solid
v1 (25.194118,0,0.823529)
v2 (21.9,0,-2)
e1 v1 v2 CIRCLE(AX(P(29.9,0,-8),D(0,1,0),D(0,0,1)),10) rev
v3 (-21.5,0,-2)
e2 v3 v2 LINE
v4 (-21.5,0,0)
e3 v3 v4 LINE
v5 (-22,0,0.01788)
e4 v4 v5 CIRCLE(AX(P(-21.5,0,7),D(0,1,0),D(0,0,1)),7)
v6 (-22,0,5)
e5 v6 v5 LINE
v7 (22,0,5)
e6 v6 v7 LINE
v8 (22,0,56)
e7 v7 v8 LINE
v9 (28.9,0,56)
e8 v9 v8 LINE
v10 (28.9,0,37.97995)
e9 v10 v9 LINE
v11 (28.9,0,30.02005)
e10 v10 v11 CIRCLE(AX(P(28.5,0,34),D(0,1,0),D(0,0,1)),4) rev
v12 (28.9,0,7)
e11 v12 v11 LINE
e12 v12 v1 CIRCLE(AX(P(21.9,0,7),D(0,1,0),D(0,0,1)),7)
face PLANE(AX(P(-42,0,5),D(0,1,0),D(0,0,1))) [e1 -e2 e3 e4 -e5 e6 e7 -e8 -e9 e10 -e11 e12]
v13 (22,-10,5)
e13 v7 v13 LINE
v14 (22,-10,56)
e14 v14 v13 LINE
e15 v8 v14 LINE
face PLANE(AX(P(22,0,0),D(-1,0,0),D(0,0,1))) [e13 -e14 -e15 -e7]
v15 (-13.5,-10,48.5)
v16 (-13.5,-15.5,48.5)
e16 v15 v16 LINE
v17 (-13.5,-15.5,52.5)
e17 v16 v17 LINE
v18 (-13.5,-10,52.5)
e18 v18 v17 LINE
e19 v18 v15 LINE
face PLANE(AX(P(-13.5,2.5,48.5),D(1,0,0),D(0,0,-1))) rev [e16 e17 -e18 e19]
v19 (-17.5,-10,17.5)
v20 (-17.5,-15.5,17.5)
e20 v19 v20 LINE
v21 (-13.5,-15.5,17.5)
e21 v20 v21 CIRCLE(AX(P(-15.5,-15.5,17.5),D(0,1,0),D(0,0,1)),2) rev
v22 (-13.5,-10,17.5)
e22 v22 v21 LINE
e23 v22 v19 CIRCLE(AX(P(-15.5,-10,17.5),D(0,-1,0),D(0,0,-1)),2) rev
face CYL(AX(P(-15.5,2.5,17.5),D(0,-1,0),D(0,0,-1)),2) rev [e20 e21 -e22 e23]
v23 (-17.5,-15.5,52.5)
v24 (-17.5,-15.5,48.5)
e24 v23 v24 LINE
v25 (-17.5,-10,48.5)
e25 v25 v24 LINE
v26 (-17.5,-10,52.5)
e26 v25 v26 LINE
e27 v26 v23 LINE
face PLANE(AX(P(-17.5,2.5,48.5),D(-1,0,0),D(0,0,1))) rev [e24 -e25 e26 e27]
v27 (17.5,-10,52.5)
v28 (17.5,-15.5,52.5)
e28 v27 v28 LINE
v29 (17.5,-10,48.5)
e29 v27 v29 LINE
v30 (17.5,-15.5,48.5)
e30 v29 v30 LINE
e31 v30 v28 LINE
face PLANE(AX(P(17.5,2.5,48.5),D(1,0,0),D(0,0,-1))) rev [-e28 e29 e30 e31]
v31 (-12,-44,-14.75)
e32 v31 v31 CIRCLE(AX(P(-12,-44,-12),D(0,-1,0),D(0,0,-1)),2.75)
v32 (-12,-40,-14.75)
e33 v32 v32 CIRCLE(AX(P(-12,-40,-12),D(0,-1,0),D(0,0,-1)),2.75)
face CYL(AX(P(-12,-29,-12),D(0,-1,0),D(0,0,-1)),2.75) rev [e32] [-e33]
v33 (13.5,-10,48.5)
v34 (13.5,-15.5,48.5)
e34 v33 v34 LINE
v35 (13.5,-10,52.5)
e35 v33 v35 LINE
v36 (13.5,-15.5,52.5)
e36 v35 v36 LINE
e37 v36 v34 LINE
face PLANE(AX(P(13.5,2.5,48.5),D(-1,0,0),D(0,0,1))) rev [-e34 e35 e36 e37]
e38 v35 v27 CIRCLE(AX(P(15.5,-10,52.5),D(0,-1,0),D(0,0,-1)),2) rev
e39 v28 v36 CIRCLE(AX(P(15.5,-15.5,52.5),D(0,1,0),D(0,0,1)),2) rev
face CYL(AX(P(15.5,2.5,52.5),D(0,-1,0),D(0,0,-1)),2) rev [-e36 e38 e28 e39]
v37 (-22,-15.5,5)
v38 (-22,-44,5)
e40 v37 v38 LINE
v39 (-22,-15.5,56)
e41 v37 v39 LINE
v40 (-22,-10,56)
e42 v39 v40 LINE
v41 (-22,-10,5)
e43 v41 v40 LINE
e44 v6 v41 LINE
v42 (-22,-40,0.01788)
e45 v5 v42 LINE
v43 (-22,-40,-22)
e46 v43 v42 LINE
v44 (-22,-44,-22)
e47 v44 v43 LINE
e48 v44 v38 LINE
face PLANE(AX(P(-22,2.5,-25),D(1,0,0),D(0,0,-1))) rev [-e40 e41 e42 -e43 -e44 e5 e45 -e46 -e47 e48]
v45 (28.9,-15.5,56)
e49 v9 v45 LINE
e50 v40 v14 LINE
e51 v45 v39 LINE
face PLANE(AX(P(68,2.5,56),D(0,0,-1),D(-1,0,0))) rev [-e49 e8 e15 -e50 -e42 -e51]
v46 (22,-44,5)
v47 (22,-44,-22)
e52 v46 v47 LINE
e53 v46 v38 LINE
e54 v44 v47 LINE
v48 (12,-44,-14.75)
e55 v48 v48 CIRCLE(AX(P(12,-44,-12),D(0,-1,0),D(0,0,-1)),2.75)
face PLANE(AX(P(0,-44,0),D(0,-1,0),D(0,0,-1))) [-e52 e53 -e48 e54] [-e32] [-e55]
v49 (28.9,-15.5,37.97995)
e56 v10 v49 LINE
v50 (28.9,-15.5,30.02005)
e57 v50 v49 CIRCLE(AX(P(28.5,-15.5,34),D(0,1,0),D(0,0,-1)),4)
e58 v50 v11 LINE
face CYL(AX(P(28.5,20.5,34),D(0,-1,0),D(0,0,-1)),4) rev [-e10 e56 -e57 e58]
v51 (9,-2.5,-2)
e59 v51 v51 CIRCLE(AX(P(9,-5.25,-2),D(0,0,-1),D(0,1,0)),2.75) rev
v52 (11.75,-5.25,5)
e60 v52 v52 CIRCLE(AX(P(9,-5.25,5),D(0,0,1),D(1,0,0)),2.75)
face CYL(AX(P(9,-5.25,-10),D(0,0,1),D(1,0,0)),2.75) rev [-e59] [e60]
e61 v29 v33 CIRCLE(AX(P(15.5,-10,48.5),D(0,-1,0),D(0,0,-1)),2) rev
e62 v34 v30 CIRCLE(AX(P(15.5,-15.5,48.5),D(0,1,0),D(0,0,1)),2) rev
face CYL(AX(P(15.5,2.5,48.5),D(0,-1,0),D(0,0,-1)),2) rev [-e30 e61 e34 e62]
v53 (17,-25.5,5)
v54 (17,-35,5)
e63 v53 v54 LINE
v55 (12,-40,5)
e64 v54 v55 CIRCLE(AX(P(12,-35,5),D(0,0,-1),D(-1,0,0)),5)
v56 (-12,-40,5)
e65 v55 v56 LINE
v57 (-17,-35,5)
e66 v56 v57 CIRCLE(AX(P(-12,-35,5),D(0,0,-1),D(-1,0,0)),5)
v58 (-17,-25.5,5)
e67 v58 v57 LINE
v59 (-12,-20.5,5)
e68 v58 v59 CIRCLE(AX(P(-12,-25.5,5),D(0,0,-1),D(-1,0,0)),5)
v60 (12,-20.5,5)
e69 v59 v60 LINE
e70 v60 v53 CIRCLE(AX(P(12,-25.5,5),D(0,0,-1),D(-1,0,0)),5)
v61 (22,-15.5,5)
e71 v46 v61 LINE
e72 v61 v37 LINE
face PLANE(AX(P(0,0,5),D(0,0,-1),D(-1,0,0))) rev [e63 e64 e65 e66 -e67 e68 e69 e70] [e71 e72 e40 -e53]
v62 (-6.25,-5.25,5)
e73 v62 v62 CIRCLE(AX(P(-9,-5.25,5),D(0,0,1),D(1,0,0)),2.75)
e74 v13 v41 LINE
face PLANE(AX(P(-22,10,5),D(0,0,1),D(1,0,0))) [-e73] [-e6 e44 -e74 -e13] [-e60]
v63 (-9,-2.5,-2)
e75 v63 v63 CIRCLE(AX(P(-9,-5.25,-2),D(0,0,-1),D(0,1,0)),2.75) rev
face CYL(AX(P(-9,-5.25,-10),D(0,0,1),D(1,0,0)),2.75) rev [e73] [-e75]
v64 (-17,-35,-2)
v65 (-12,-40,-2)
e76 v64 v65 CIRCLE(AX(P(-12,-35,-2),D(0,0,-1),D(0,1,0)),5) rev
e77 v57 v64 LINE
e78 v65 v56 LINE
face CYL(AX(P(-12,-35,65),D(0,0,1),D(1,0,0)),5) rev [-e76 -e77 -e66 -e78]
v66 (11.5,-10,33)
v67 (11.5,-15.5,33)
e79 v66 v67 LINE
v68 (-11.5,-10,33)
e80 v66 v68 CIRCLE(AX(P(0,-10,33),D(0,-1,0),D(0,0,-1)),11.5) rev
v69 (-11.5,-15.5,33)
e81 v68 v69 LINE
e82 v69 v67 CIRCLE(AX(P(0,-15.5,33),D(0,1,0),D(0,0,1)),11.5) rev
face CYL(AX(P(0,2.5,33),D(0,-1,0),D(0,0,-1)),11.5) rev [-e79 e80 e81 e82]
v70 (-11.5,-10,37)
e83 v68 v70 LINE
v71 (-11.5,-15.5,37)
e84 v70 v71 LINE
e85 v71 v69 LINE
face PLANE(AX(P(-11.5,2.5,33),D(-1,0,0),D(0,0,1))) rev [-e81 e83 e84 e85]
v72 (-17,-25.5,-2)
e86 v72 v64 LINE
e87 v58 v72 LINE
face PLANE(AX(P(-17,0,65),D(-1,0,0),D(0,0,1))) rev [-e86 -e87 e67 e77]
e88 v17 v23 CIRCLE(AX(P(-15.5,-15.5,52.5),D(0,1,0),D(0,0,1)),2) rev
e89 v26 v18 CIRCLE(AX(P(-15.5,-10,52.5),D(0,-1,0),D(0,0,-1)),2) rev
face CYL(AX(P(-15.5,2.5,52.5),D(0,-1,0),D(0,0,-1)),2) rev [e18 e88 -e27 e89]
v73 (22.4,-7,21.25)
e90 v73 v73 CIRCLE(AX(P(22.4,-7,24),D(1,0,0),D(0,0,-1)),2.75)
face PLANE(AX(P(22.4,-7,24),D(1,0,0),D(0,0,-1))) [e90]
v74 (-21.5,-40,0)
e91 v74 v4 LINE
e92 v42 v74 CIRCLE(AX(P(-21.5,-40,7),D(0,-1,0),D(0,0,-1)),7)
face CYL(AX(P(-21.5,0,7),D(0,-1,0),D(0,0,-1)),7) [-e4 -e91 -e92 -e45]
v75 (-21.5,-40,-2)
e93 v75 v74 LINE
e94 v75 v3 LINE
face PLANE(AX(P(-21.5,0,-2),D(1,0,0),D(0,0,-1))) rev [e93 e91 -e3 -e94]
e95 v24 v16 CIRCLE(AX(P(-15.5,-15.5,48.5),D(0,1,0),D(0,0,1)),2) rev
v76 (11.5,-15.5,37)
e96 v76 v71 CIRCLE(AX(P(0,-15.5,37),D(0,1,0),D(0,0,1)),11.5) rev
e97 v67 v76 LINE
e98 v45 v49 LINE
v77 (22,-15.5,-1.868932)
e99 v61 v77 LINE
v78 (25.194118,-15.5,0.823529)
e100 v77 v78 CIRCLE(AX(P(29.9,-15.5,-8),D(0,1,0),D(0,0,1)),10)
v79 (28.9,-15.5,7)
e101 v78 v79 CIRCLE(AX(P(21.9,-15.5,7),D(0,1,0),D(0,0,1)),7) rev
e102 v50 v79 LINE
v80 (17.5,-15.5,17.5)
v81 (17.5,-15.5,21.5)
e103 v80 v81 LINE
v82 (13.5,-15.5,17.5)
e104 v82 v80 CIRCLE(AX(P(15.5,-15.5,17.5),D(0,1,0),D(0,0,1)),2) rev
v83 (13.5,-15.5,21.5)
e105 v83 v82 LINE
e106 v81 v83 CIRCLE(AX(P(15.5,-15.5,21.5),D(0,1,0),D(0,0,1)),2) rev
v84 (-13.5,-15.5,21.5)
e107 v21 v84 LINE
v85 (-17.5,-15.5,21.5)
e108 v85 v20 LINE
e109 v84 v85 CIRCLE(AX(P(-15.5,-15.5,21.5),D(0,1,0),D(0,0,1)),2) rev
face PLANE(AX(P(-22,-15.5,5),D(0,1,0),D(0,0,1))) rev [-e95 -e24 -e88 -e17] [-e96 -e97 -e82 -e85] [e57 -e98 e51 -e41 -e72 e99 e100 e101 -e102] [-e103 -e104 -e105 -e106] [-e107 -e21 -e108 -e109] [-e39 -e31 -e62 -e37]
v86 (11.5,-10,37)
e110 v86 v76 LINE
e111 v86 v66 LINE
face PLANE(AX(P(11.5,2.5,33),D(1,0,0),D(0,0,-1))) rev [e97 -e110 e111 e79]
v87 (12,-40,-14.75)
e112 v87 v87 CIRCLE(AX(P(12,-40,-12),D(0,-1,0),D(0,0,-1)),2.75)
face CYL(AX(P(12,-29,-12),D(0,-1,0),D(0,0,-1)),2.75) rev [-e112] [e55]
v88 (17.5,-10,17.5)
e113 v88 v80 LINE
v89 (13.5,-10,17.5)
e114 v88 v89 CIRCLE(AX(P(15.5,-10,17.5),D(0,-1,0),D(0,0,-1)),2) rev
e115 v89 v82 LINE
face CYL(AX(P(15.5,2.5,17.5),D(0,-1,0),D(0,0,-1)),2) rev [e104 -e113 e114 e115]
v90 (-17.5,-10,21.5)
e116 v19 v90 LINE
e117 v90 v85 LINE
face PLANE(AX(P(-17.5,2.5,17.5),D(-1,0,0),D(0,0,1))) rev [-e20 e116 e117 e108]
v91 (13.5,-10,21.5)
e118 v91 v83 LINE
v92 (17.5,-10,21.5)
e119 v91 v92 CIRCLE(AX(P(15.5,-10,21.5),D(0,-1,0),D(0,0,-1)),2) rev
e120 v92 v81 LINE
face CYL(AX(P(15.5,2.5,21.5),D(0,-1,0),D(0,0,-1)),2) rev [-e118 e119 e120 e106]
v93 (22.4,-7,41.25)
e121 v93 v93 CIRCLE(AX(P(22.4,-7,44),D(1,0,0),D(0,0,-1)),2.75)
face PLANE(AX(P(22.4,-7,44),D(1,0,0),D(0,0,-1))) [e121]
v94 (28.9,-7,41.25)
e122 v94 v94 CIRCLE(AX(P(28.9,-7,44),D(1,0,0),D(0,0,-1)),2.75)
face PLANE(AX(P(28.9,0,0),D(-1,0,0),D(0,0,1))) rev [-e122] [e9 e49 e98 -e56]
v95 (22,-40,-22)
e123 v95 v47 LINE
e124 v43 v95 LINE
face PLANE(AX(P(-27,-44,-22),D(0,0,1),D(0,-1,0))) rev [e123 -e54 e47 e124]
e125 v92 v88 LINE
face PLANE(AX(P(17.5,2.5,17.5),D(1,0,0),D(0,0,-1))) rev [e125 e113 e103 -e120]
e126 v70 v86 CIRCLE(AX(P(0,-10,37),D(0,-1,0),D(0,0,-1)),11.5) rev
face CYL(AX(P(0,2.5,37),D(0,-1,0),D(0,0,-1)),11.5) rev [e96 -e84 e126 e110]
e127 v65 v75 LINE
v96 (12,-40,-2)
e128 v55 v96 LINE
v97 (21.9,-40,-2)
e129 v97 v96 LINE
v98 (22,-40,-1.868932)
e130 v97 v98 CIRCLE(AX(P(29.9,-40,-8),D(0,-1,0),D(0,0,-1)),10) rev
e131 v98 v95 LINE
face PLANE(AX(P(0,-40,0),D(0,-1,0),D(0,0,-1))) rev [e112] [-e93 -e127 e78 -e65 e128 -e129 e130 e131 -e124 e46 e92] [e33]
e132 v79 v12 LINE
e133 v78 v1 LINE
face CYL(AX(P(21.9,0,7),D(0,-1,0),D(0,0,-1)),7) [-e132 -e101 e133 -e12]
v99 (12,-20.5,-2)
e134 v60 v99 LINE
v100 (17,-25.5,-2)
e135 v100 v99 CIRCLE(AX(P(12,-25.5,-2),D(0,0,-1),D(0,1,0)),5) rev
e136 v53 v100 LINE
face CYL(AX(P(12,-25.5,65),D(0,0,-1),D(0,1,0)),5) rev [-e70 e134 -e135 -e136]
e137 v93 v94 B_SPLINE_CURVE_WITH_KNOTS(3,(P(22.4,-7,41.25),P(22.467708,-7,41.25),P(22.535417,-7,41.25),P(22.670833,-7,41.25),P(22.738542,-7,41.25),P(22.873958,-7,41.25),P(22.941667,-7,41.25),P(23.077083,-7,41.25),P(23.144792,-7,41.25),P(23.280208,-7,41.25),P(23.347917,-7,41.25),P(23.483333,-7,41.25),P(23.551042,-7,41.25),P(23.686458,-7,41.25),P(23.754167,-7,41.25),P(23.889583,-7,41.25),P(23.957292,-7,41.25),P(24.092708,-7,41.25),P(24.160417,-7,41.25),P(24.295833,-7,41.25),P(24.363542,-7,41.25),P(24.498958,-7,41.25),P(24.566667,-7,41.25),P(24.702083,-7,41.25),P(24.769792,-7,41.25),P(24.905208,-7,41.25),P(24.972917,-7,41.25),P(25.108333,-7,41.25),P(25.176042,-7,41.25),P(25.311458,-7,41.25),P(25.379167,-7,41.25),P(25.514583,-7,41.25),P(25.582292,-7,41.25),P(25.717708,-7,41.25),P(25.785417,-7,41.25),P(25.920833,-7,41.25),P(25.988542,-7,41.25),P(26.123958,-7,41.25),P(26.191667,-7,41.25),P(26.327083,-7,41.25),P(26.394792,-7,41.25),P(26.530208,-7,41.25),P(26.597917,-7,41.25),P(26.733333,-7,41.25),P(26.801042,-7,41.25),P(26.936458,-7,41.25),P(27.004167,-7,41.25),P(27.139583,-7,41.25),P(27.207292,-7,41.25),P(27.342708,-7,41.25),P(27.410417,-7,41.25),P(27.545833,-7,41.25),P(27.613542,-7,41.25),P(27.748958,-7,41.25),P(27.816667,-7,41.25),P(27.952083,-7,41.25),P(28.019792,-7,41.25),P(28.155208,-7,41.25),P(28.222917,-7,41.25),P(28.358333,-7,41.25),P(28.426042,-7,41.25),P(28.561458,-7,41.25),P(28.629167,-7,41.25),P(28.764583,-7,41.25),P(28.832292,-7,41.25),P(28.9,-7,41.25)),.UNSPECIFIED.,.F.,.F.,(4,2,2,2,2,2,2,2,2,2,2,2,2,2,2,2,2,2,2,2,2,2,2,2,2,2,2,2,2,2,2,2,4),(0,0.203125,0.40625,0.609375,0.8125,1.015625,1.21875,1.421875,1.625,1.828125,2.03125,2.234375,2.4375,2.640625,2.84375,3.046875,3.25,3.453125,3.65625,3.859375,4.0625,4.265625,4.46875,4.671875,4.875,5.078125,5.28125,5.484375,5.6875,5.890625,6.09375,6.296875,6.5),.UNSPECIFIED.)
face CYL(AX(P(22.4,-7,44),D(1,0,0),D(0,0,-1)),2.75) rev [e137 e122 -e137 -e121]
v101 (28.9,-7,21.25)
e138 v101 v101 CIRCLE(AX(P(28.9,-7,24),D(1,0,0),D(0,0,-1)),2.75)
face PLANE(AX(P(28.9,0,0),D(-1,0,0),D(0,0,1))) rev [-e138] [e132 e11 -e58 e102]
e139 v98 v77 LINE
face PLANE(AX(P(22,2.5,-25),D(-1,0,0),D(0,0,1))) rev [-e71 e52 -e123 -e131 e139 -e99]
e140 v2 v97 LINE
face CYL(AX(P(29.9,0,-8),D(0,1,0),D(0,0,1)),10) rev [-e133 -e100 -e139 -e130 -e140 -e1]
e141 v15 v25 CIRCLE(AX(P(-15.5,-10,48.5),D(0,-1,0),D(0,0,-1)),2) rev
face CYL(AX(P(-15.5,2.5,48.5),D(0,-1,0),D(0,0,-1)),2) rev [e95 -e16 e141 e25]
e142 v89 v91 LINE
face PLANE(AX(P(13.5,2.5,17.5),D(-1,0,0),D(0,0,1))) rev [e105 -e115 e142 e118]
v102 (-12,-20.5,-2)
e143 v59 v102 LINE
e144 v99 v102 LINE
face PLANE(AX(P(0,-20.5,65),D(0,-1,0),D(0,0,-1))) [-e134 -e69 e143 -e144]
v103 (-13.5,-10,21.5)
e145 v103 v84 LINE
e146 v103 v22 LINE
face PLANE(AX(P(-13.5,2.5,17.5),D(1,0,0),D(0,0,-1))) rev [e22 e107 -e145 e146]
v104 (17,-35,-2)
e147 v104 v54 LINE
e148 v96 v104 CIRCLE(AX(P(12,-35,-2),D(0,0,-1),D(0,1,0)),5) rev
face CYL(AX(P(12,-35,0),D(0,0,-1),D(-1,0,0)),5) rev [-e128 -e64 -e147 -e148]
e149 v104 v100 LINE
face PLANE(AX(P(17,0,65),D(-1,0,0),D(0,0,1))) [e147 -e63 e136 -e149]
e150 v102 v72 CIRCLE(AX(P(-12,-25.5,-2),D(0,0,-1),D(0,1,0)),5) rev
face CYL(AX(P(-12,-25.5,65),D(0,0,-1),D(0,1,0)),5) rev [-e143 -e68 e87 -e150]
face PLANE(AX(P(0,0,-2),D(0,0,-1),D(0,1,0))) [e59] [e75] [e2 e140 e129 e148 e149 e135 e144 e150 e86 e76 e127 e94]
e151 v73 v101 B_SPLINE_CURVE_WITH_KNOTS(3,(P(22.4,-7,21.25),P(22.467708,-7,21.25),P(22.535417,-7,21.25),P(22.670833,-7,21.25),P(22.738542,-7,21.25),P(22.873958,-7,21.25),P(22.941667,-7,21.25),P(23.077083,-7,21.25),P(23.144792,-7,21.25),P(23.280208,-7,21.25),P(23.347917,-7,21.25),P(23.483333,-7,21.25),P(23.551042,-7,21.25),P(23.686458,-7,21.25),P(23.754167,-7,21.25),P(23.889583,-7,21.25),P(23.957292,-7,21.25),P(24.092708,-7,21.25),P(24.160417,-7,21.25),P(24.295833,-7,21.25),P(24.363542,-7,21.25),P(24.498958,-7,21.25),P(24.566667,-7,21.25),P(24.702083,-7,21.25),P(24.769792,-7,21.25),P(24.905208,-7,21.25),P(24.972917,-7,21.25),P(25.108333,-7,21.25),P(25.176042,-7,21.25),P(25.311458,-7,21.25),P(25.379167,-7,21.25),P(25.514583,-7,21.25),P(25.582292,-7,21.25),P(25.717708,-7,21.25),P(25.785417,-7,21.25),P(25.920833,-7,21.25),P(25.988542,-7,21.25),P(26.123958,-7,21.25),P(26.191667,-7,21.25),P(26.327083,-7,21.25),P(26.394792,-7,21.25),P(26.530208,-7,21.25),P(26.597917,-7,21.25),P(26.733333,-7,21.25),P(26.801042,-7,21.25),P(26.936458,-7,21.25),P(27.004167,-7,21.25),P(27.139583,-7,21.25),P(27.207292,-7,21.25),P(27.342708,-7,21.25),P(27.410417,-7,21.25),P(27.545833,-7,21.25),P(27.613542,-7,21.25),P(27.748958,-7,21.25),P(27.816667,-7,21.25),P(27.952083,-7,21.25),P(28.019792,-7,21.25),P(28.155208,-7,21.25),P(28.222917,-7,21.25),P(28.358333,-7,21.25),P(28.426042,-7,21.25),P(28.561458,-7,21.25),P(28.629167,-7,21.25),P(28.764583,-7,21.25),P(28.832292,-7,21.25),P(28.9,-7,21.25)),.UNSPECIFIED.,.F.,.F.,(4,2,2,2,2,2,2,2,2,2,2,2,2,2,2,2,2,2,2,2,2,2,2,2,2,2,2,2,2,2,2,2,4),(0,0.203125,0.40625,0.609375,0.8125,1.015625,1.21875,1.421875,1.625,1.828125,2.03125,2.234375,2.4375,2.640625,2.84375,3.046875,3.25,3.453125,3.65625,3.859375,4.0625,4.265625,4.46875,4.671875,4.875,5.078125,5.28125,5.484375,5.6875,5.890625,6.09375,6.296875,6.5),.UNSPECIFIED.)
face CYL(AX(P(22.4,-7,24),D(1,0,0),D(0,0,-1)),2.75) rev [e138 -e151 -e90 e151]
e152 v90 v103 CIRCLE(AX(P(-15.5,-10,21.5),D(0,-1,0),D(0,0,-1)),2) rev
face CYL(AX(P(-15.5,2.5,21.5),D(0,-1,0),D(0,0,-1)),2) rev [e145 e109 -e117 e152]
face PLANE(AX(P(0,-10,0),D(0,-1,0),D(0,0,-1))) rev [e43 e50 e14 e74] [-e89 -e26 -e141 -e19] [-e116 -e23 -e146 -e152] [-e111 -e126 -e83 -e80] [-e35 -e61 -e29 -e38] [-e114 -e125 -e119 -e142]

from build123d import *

# Parameters (mm, degrees)
BOSS_EXTRUDE1_DEPTH      = 42
BOSS_EXTRUDE1_DEPTH_BACK = 42
SKETCH2_R                = 2.75
SKETCH2_W                = 15
SKETCH2_H                = 2.5
CUT_EXTRUDE1_DEPTH       = 100.161484458
SKETCH3_R                = 4
SKETCH3_W                = 15
SKETCH3_H                = 60
CUT_EXTRUDE2_DEPTH       = 101.743486312
SKETCH4_W                = 44
SKETCH4_H                = 46.5
CUT_EXTRUDE3_DEPTH       = 60
CUT_EXTRUDE4_DEPTH       = 10
CUT_EXTRUDE4_DEPTH_BACK  = 10
SKETCH5_W                = 44
SKETCH5_H                = 51
SKETCH6_R                = 2.75
CUT_EXTRUDE5_DEPTH       = 4.6
SKETCH7_W                = 15
SKETCH7_H                = 62
CUT_EXTRUDE6_DEPTH       = 63
SKETCH8_W                = 54
SKETCH8_H                = 22
CUT_EXTRUDE7_DEPTH       = 63
SKETCH9_W                = 54
SKETCH9_H                = 27
BOSS_EXTRUDE2_DEPTH      = 4
FILLET1_R                = 5
SKETCH12_W               = 5
SKETCH12_H               = 11.450523872
BOSS_EXTRUDE4_DEPTH      = 4
CUT_EXTRUDE8_START       = -113
SKETCH13_R               = 65
CUT_EXTRUDE8_DEPTH       = 113
SKETCH14_R               = 2.75
CUT_EXTRUDE9_DEPTH       = 15
SKETCH15_R               = 2.75
CUT_EXTRUDE10_DEPTH      = 15
SKETCH16_W               = 5
SKETCH16_H               = 46.5
CUT_EXTRUDE11_DEPTH      = 90
SKETCH17_W               = 9
SKETCH17_H               = 18
CUT_EXTRUDE12_DEPTH      = 90
SKETCH23_W               = 56
SKETCH23_H               = 15.5
BOSS_EXTRUDE10_DEPTH     = 6.9
SKETCH18_W               = 56
SKETCH18_H               = 15.5
SKETCH18_R               = 2.75
BOSS_EXTRUDE5_DEPTH      = 6.5
SKETCH19_R               = 4
CUT_EXTRUDE13_DEPTH      = 36
FILLET2_R                = 7
FILLET5_R                = 7
SKETCH24_R               = 2.75
CUT_EXTRUDE14_DEPTH      = 6.5
SKETCH26_W               = 56
SKETCH26_H               = 15.5
CUT_EXTRUDE15_DEPTH      = 6.5
SKETCH27_R               = 2.75
BOSS_EXTRUDE11_DEPTH     = 2
FILLET6_R                = 10


with BuildPart() as part:
    # Sketch1 → Boss-Extrude1 (new, two sides: drawn at the far end of the back side and taken through both)
    with BuildSketch(Plane(origin=(0, 0, 0), x_dir=(0, 0, -1), z_dir=(1, 0, 0)).offset(-BOSS_EXTRUDE1_DEPTH_BACK)):
        with BuildLine():
            Line((0, 0), (0, -62))
            Line((0, -62), (-5, -62))
            ThreePointArc((-5, -62), (-27.506882202, -29.081460906), (-65, -15.5))
            Line((-65, -15.5), (-65, 2.5))
            Line((-65, 2.5), (-56, 2.5))
            ThreePointArc((-56, 2.5), (-30.901836055, -6.947455525), (-5, 0))
            Line((-5, 0), (0, 0))
        make_face()
    extrude(amount=BOSS_EXTRUDE1_DEPTH + BOSS_EXTRUDE1_DEPTH_BACK)

    # Sketch2 → Cut-Extrude1 (cut, through all)
    with BuildSketch(Plane(origin=(0, 0, 0), x_dir=(-1, 0, 0), z_dir=(0, 0, -1))):
        with Locations(Location((-36, -6, 0), (0, 0, 90))):
            Circle(SKETCH2_R)
        with BuildLine():
            ThreePointArc((-42, -53.6792), (-32.778829166, -31), (-42, -8.3208))
            Line((-42, -8.3208), (-42, -53.6792))
        make_face()
        with BuildLine():
            ThreePointArc((-17, -25.5), (-15.535533906, -21.964466094), (-12, -20.5))
            Line((-12, -20.5), (12, -20.5))
            ThreePointArc((12, -20.5), (15.535533906, -21.964466094), (17, -25.5))
            Line((17, -25.5), (17, -49))
            ThreePointArc((17, -49), (15.535533906, -52.535533906), (12, -54))
            Line((12, -54), (-12, -54))
            ThreePointArc((-12, -54), (-15.535533906, -52.535533906), (-17, -49))
            Line((-17, -49), (-17, -25.5))
        make_face()
        with Locations(Location((-36, -56, 0), (0, 0, 90))):
            Circle(SKETCH2_R)
        with Locations(Location((36, -56, 0), (0, 0, 90))):
            Circle(SKETCH2_R)
        with Locations(Location((36, -6, 0), (0, 0, 90))):
            Circle(SKETCH2_R)
        with Locations((34.5, 1.25)):
            Rectangle(SKETCH2_W, SKETCH2_H)
        with Locations((-34.5, 1.25)):
            Rectangle(SKETCH2_W, SKETCH2_H)
        with BuildLine():
            Line((42, -53.6792), (42, -8.3208))
            ThreePointArc((42, -8.3208), (32.778829166, -31), (42, -53.6792))
        make_face()
    extrude(amount=-CUT_EXTRUDE1_DEPTH, mode=Mode.SUBTRACT)

    # Sketch3 → Cut-Extrude2 (cut, through all)
    with BuildSketch(Plane(origin=(0, -62, 0), x_dir=(-1, 0, 0), z_dir=(0, -1, 0))):
        with Locations((0, -65)):
            Circle(SKETCH3_R)
        with Locations((34.5, -35)):
            Rectangle(SKETCH3_W, SKETCH3_H)
        with Locations((-34.5, -35)):
            Rectangle(SKETCH3_W, SKETCH3_H)
        with BuildLine():
            Line((11.5, -33), (11.5, -37))
            ThreePointArc((11.5, -37), (0, -48.5), (-11.5, -37))
            Line((-11.5, -37), (-11.5, -33))
            ThreePointArc((-11.5, -33), (0, -21.5), (11.5, -33))
        make_face()
        with BuildLine():
            Line((17.5, -48.5), (17.5, -52.5))
            ThreePointArc((17.5, -52.5), (15.5, -54.5), (13.5, -52.5))
            Line((13.5, -52.5), (13.5, -48.5))
            ThreePointArc((13.5, -48.5), (15.5, -46.5), (17.5, -48.5))
        make_face()
        with BuildLine():
            Line((17.5, -17.5), (17.5, -21.5))
            ThreePointArc((17.5, -21.5), (15.5, -23.5), (13.5, -21.5))
            Line((13.5, -21.5), (13.5, -17.5))
            ThreePointArc((13.5, -17.5), (15.5, -15.5), (17.5, -17.5))
        make_face()
        with BuildLine():
            Line((-17.5, -17.5), (-17.5, -21.5))
            ThreePointArc((-17.5, -21.5), (-15.5, -23.5), (-13.5, -21.5))
            Line((-13.5, -21.5), (-13.5, -17.5))
            ThreePointArc((-13.5, -17.5), (-15.5, -15.5), (-17.5, -17.5))
        make_face()
        with BuildLine():
            Line((-17.5, -48.5), (-17.5, -52.5))
            ThreePointArc((-17.5, -52.5), (-15.5, -54.5), (-13.5, -52.5))
            Line((-13.5, -52.5), (-13.5, -48.5))
            ThreePointArc((-13.5, -48.5), (-15.5, -46.5), (-17.5, -48.5))
        make_face()
    extrude(amount=-CUT_EXTRUDE2_DEPTH, mode=Mode.SUBTRACT)

    # Sketch4 → Cut-Extrude3 (cut)
    with BuildSketch(Plane.XY.offset(65)):
        with Locations((0, -38.75)):
            Rectangle(SKETCH4_W, SKETCH4_H)
    extrude(amount=-CUT_EXTRUDE3_DEPTH, mode=Mode.SUBTRACT)

    # Sketch5 → Cut-Extrude4 (cut, two sides: drawn at the far end of the back side and taken through both)
    with BuildSketch(Plane(origin=(0, 0, 0), x_dir=(1, 0, 0), z_dir=(0, 1, 0)).offset(-CUT_EXTRUDE4_DEPTH_BACK)):
        with Locations((0, -30.5)):
            Rectangle(SKETCH5_W, SKETCH5_H)
    extrude(amount=CUT_EXTRUDE4_DEPTH + CUT_EXTRUDE4_DEPTH_BACK, mode=Mode.SUBTRACT)

    # Sketch6 → Cut-Extrude5 (cut)
    with BuildSketch(Plane.XY.offset(65)):
        with Locations((-10, -5.5)):
            Circle(SKETCH6_R)
        with Locations((10, -5.5)):
            Circle(SKETCH6_R)
    extrude(amount=-CUT_EXTRUDE5_DEPTH, mode=Mode.SUBTRACT)

    # Sketch7 → Cut-Extrude6 (cut)
    with BuildSketch(Plane.XY.offset(5)):
        with Locations((34.5, -31)):
            Rectangle(SKETCH7_W, SKETCH7_H)
        with Locations((-34.5, -31)):
            Rectangle(SKETCH7_W, SKETCH7_H)
    extrude(amount=-CUT_EXTRUDE6_DEPTH, mode=Mode.SUBTRACT)

    # Sketch8 → Cut-Extrude7 (cut)
    with BuildSketch(Plane(origin=(0, 0, 0), x_dir=(-1, 0, 0), z_dir=(0, 0, -1))):
        with Locations((0, -51)):
            Rectangle(SKETCH8_W, SKETCH8_H)
    extrude(amount=-CUT_EXTRUDE7_DEPTH, mode=Mode.SUBTRACT)

    # Sketch9 → Boss-Extrude2 (add)
    with BuildSketch(Plane.XZ.offset(40)):
        with Locations((0, -8.5)):
            Rectangle(SKETCH9_W, SKETCH9_H)
    extrude(amount=BOSS_EXTRUDE2_DEPTH)

    # Fillet1
    fillet1_edges = [part.edges().sort_by_distance(p)[0] for p in [
        (17, -40, 2.5),
        (-17, -40, 2.5),
    ]]
    fillet(fillet1_edges, radius=FILLET1_R)

    # Sketch12 → Boss-Extrude4 (add)
    with BuildSketch(Plane.XZ.offset(40)):
        with Locations((-24.5, 10.725261936)):
            Rectangle(SKETCH12_W, SKETCH12_H)
        with Locations((24.5, 10.725261936)):
            Rectangle(SKETCH12_W, SKETCH12_H)
    extrude(amount=BOSS_EXTRUDE4_DEPTH)

    # Sketch13 → Cut-Extrude8 (cut)
    with BuildSketch(Plane(origin=(27, 0, 0), x_dir=(0, 0, -1), z_dir=(1, 0, 0)).offset(CUT_EXTRUDE8_START)):
        with Locations((-67.324040456, -80.458439297)):
            Circle(SKETCH13_R)
    extrude(amount=CUT_EXTRUDE8_DEPTH, mode=Mode.SUBTRACT)

    # Sketch14 → Cut-Extrude9 (cut)
    with BuildSketch(Plane.XZ.offset(44)):
        with Locations(Location((12, -12, 0), (0, 0, 270))):
            Circle(SKETCH14_R)
        with Locations(Location((-12, -12, 0), (0, 0, 270))):
            Circle(SKETCH14_R)
    extrude(amount=-CUT_EXTRUDE9_DEPTH, mode=Mode.SUBTRACT)

    # Sketch15 → Cut-Extrude10 (cut)
    with BuildSketch(Plane.XY.offset(5)):
        with Locations((9, -5.25)):
            Circle(SKETCH15_R)
        with Locations((-9, -5.25)):
            Circle(SKETCH15_R)
    extrude(amount=-CUT_EXTRUDE10_DEPTH, mode=Mode.SUBTRACT)

    # Sketch16 → Cut-Extrude11 (cut)
    with BuildSketch(Plane.XY.offset(65)):
        with Locations((-24.5, -20.75)):
            Rectangle(SKETCH16_W, SKETCH16_H)
        with Locations((24.5, -20.75)):
            Rectangle(SKETCH16_W, SKETCH16_H)
    extrude(amount=-CUT_EXTRUDE11_DEPTH, mode=Mode.SUBTRACT)

    # Sketch17 → Cut-Extrude12 (cut)
    with BuildSketch(Plane.ZY.offset(22)):
        with Locations((60.5, -6.5)):
            Rectangle(SKETCH17_W, SKETCH17_H)
    extrude(amount=-CUT_EXTRUDE12_DEPTH, mode=Mode.SUBTRACT)

    # Sketch23 → Boss-Extrude10 (add)
    with BuildSketch(Plane(origin=(22, 0, 0), x_dir=(0, 0, -1), z_dir=(1, 0, 0))):
        with Locations((-28, -7.75)):
            Rectangle(SKETCH23_W, SKETCH23_H)
    extrude(amount=BOSS_EXTRUDE10_DEPTH)

    # Sketch18 → Boss-Extrude5 (add)
    with BuildSketch(Plane.ZY.offset(22)):
        with Locations((28, -7.75)):
            Rectangle(SKETCH18_W, SKETCH18_H)
        with Locations(Location((24, -7.25, 0), (0, 0, 270))):
            Circle(SKETCH18_R, mode=Mode.SUBTRACT)
        with Locations(Location((44, -7.25, 0), (0, 0, 270))):
            Circle(SKETCH18_R, mode=Mode.SUBTRACT)
    extrude(amount=BOSS_EXTRUDE5_DEPTH)

    # Sketch19 → Cut-Extrude13 (cut)
    with BuildSketch(Plane.XZ.offset(15.5)):
        with Locations((-28.5, 34)):
            Circle(SKETCH19_R)
    cut_extrude13 = extrude(amount=-CUT_EXTRUDE13_DEPTH, mode=Mode.SUBTRACT)

    # Fillet2
    fillet2_edges = [part.edges().sort_by_distance(p)[0] for p in [
        (-28.5, -7.75, 0),
    ]]
    fillet(fillet2_edges, radius=FILLET2_R)

    # Mirror5: Cut-Extrude13 across plane
    add(cut_extrude13.mirror(Plane(origin=(0, 0, 0), x_dir=(0, 0, 1), z_dir=(1, 0, 0))), mode=Mode.SUBTRACT)

    # Fillet5
    fillet5_edges = [part.edges().sort_by_distance(p)[0] for p in [
        (28.9, -7.75, 0),
    ]]
    fillet(fillet5_edges, radius=FILLET5_R)

    # Sketch24 → Cut-Extrude14 (cut)
    with BuildSketch(Plane(origin=(28.9, 0, 0), x_dir=(0, 0, -1), z_dir=(1, 0, 0))):
        with Locations((-44, -7)):
            Circle(SKETCH24_R)
        with Locations((-24, -7)):
            Circle(SKETCH24_R)
    extrude(amount=-CUT_EXTRUDE14_DEPTH, mode=Mode.SUBTRACT)

    # Sketch26 → Cut-Extrude15 (cut)
    with BuildSketch(Plane.ZY.offset(28.5)):
        with Locations((28, -7.75)):
            Rectangle(SKETCH26_W, SKETCH26_H)
    extrude(amount=-CUT_EXTRUDE15_DEPTH, mode=Mode.SUBTRACT)

    # Sketch27 → Boss-Extrude11 (add)
    with BuildSketch(Plane(origin=(0, 0, 0), x_dir=(-1, 0, 0), z_dir=(0, 0, -1))):
        with BuildLine():
            Line((21.5, -40), (21.5, 0))
            Line((21.5, 0), (-21.9, 0))
            Line((-21.9, 0), (-21.9, -40))
            Line((-21.9, -40), (-12, -40))
            ThreePointArc((-12, -40), (-15.535533906, -38.535533906), (-17, -35))
            Line((-17, -35), (-17, -25.5))
            ThreePointArc((-17, -25.5), (-15.535533906, -21.964466094), (-12, -20.5))
            Line((-12, -20.5), (12, -20.5))
            ThreePointArc((12, -20.5), (15.535533906, -21.964466094), (17, -25.5))
            Line((17, -25.5), (17, -35))
            ThreePointArc((17, -35), (15.535533906, -38.535533906), (12, -40))
            Line((12, -40), (21.5, -40))
        make_face()
        with Locations(Location((9, -5.25, 0), (0, 0, 180))):
            Circle(SKETCH27_R, mode=Mode.SUBTRACT)
        with Locations(Location((-9, -5.25, 0), (0, 0, 180))):
            Circle(SKETCH27_R, mode=Mode.SUBTRACT)
    extrude(amount=BOSS_EXTRUDE11_DEPTH)

    # Fillet6
    # the kernel refuses this fillet: 10 mm, written as the material it adds along each edge
    with BuildSketch(Plane(origin=(21.9, -40, 0), x_dir=(0, 0, -1), z_dir=(0, 1, 0))) as fillet6_piece_1_section:
        with BuildLine():
            CenterArc((8, -8), FILLET6_R, 126.869897646, 25.057615418)
            Line((-0.823529412, -3.294117647), (-1, -3.2))
            ThreePointArc((-1, -3.2), (-0.403030999, -1.64924225), (-0.2, 0))
            Line((-0.2, 0), (0, 0.2))
            ThreePointArc((0, 0.2), (1, 0.2), (1.88, 0.16))
            Line((1.88, 0.16), (2, 0))
        make_face()
    fillet6_piece_1 = extrude(amount=40, mode=Mode.PRIVATE)
    fillet6_piece_1 = split(fillet6_piece_1, bisect_by=Plane(origin=(22, -27.75, -0.877476934), z_dir=(-1, 0, 0)), keep=Keep.TOP, mode=Mode.PRIVATE)
    fillet6_piece_1 = split(fillet6_piece_1, bisect_by=Plane(origin=(21.85575196, -15.5, -0.877476934), z_dir=(0, -1, 0)), keep=Keep.TOP, mode=Mode.PRIVATE)
    add(fillet6_piece_1)
    with BuildSketch(Plane(origin=(21.9, -40, 0), x_dir=(0, 0, -1), z_dir=(0, 1, 0))) as fillet6_piece_2_section:
        with BuildLine():
            CenterArc((8, -8), FILLET6_R, 126.869897646, 25.057615418)
            Line((-0.823529412, -3.294117647), (-1, -3.2))
            ThreePointArc((-1, -3.2), (-0.403030999, -1.64924225), (-0.2, 0))
            Line((-0.2, 0), (0, 0.2))
            ThreePointArc((0, 0.2), (1, 0.2), (1.88, 0.16))
            Line((1.88, 0.16), (2, 0))
        make_face()
    fillet6_piece_2 = extrude(amount=40, mode=Mode.PRIVATE)
    fillet6_piece_2 = split(fillet6_piece_2, bisect_by=Plane(origin=(22, -7.75, -0.877476934), z_dir=(-1, 0, 0)), keep=Keep.TOP, mode=Mode.PRIVATE)
    fillet6_piece_2 = split(fillet6_piece_2, bisect_by=Plane(origin=(21.85575196, -15.5, -0.877476934), z_dir=(0, 1, 0)), keep=Keep.TOP, mode=Mode.PRIVATE)
    add(fillet6_piece_2)
    with BuildSketch(Plane(origin=(21.9, -40, 0), x_dir=(0, 0, -1), z_dir=(0, 1, 0))) as fillet6_piece_3_section:
        with BuildLine():
            CenterArc((8, -8), FILLET6_R, 126.869897646, 25.057615418)
            Line((-0.823529412, -3.294117647), (-1, -3.2))
            ThreePointArc((-1, -3.2), (-0.403030999, -1.64924225), (-0.2, 0))
            Line((-0.2, 0), (0, 0.2))
            ThreePointArc((0, 0.2), (1, 0.2), (1.88, 0.16))
            Line((1.88, 0.16), (2, 0))
        make_face()
    fillet6_piece_3 = extrude(amount=40, mode=Mode.PRIVATE)
    fillet6_piece_3 = split(fillet6_piece_3, bisect_by=Plane(origin=(22, -7.75, -0.252980479), z_dir=(1, 0, 0)), keep=Keep.TOP, mode=Mode.PRIVATE)
    fillet6_piece_3 = split(fillet6_piece_3, bisect_by=Plane(origin=(22.996225297, -15.5, -0.252980479), z_dir=(0, 1, 0)), keep=Keep.TOP, mode=Mode.PRIVATE)
    add(fillet6_piece_3)


solid = part.part
